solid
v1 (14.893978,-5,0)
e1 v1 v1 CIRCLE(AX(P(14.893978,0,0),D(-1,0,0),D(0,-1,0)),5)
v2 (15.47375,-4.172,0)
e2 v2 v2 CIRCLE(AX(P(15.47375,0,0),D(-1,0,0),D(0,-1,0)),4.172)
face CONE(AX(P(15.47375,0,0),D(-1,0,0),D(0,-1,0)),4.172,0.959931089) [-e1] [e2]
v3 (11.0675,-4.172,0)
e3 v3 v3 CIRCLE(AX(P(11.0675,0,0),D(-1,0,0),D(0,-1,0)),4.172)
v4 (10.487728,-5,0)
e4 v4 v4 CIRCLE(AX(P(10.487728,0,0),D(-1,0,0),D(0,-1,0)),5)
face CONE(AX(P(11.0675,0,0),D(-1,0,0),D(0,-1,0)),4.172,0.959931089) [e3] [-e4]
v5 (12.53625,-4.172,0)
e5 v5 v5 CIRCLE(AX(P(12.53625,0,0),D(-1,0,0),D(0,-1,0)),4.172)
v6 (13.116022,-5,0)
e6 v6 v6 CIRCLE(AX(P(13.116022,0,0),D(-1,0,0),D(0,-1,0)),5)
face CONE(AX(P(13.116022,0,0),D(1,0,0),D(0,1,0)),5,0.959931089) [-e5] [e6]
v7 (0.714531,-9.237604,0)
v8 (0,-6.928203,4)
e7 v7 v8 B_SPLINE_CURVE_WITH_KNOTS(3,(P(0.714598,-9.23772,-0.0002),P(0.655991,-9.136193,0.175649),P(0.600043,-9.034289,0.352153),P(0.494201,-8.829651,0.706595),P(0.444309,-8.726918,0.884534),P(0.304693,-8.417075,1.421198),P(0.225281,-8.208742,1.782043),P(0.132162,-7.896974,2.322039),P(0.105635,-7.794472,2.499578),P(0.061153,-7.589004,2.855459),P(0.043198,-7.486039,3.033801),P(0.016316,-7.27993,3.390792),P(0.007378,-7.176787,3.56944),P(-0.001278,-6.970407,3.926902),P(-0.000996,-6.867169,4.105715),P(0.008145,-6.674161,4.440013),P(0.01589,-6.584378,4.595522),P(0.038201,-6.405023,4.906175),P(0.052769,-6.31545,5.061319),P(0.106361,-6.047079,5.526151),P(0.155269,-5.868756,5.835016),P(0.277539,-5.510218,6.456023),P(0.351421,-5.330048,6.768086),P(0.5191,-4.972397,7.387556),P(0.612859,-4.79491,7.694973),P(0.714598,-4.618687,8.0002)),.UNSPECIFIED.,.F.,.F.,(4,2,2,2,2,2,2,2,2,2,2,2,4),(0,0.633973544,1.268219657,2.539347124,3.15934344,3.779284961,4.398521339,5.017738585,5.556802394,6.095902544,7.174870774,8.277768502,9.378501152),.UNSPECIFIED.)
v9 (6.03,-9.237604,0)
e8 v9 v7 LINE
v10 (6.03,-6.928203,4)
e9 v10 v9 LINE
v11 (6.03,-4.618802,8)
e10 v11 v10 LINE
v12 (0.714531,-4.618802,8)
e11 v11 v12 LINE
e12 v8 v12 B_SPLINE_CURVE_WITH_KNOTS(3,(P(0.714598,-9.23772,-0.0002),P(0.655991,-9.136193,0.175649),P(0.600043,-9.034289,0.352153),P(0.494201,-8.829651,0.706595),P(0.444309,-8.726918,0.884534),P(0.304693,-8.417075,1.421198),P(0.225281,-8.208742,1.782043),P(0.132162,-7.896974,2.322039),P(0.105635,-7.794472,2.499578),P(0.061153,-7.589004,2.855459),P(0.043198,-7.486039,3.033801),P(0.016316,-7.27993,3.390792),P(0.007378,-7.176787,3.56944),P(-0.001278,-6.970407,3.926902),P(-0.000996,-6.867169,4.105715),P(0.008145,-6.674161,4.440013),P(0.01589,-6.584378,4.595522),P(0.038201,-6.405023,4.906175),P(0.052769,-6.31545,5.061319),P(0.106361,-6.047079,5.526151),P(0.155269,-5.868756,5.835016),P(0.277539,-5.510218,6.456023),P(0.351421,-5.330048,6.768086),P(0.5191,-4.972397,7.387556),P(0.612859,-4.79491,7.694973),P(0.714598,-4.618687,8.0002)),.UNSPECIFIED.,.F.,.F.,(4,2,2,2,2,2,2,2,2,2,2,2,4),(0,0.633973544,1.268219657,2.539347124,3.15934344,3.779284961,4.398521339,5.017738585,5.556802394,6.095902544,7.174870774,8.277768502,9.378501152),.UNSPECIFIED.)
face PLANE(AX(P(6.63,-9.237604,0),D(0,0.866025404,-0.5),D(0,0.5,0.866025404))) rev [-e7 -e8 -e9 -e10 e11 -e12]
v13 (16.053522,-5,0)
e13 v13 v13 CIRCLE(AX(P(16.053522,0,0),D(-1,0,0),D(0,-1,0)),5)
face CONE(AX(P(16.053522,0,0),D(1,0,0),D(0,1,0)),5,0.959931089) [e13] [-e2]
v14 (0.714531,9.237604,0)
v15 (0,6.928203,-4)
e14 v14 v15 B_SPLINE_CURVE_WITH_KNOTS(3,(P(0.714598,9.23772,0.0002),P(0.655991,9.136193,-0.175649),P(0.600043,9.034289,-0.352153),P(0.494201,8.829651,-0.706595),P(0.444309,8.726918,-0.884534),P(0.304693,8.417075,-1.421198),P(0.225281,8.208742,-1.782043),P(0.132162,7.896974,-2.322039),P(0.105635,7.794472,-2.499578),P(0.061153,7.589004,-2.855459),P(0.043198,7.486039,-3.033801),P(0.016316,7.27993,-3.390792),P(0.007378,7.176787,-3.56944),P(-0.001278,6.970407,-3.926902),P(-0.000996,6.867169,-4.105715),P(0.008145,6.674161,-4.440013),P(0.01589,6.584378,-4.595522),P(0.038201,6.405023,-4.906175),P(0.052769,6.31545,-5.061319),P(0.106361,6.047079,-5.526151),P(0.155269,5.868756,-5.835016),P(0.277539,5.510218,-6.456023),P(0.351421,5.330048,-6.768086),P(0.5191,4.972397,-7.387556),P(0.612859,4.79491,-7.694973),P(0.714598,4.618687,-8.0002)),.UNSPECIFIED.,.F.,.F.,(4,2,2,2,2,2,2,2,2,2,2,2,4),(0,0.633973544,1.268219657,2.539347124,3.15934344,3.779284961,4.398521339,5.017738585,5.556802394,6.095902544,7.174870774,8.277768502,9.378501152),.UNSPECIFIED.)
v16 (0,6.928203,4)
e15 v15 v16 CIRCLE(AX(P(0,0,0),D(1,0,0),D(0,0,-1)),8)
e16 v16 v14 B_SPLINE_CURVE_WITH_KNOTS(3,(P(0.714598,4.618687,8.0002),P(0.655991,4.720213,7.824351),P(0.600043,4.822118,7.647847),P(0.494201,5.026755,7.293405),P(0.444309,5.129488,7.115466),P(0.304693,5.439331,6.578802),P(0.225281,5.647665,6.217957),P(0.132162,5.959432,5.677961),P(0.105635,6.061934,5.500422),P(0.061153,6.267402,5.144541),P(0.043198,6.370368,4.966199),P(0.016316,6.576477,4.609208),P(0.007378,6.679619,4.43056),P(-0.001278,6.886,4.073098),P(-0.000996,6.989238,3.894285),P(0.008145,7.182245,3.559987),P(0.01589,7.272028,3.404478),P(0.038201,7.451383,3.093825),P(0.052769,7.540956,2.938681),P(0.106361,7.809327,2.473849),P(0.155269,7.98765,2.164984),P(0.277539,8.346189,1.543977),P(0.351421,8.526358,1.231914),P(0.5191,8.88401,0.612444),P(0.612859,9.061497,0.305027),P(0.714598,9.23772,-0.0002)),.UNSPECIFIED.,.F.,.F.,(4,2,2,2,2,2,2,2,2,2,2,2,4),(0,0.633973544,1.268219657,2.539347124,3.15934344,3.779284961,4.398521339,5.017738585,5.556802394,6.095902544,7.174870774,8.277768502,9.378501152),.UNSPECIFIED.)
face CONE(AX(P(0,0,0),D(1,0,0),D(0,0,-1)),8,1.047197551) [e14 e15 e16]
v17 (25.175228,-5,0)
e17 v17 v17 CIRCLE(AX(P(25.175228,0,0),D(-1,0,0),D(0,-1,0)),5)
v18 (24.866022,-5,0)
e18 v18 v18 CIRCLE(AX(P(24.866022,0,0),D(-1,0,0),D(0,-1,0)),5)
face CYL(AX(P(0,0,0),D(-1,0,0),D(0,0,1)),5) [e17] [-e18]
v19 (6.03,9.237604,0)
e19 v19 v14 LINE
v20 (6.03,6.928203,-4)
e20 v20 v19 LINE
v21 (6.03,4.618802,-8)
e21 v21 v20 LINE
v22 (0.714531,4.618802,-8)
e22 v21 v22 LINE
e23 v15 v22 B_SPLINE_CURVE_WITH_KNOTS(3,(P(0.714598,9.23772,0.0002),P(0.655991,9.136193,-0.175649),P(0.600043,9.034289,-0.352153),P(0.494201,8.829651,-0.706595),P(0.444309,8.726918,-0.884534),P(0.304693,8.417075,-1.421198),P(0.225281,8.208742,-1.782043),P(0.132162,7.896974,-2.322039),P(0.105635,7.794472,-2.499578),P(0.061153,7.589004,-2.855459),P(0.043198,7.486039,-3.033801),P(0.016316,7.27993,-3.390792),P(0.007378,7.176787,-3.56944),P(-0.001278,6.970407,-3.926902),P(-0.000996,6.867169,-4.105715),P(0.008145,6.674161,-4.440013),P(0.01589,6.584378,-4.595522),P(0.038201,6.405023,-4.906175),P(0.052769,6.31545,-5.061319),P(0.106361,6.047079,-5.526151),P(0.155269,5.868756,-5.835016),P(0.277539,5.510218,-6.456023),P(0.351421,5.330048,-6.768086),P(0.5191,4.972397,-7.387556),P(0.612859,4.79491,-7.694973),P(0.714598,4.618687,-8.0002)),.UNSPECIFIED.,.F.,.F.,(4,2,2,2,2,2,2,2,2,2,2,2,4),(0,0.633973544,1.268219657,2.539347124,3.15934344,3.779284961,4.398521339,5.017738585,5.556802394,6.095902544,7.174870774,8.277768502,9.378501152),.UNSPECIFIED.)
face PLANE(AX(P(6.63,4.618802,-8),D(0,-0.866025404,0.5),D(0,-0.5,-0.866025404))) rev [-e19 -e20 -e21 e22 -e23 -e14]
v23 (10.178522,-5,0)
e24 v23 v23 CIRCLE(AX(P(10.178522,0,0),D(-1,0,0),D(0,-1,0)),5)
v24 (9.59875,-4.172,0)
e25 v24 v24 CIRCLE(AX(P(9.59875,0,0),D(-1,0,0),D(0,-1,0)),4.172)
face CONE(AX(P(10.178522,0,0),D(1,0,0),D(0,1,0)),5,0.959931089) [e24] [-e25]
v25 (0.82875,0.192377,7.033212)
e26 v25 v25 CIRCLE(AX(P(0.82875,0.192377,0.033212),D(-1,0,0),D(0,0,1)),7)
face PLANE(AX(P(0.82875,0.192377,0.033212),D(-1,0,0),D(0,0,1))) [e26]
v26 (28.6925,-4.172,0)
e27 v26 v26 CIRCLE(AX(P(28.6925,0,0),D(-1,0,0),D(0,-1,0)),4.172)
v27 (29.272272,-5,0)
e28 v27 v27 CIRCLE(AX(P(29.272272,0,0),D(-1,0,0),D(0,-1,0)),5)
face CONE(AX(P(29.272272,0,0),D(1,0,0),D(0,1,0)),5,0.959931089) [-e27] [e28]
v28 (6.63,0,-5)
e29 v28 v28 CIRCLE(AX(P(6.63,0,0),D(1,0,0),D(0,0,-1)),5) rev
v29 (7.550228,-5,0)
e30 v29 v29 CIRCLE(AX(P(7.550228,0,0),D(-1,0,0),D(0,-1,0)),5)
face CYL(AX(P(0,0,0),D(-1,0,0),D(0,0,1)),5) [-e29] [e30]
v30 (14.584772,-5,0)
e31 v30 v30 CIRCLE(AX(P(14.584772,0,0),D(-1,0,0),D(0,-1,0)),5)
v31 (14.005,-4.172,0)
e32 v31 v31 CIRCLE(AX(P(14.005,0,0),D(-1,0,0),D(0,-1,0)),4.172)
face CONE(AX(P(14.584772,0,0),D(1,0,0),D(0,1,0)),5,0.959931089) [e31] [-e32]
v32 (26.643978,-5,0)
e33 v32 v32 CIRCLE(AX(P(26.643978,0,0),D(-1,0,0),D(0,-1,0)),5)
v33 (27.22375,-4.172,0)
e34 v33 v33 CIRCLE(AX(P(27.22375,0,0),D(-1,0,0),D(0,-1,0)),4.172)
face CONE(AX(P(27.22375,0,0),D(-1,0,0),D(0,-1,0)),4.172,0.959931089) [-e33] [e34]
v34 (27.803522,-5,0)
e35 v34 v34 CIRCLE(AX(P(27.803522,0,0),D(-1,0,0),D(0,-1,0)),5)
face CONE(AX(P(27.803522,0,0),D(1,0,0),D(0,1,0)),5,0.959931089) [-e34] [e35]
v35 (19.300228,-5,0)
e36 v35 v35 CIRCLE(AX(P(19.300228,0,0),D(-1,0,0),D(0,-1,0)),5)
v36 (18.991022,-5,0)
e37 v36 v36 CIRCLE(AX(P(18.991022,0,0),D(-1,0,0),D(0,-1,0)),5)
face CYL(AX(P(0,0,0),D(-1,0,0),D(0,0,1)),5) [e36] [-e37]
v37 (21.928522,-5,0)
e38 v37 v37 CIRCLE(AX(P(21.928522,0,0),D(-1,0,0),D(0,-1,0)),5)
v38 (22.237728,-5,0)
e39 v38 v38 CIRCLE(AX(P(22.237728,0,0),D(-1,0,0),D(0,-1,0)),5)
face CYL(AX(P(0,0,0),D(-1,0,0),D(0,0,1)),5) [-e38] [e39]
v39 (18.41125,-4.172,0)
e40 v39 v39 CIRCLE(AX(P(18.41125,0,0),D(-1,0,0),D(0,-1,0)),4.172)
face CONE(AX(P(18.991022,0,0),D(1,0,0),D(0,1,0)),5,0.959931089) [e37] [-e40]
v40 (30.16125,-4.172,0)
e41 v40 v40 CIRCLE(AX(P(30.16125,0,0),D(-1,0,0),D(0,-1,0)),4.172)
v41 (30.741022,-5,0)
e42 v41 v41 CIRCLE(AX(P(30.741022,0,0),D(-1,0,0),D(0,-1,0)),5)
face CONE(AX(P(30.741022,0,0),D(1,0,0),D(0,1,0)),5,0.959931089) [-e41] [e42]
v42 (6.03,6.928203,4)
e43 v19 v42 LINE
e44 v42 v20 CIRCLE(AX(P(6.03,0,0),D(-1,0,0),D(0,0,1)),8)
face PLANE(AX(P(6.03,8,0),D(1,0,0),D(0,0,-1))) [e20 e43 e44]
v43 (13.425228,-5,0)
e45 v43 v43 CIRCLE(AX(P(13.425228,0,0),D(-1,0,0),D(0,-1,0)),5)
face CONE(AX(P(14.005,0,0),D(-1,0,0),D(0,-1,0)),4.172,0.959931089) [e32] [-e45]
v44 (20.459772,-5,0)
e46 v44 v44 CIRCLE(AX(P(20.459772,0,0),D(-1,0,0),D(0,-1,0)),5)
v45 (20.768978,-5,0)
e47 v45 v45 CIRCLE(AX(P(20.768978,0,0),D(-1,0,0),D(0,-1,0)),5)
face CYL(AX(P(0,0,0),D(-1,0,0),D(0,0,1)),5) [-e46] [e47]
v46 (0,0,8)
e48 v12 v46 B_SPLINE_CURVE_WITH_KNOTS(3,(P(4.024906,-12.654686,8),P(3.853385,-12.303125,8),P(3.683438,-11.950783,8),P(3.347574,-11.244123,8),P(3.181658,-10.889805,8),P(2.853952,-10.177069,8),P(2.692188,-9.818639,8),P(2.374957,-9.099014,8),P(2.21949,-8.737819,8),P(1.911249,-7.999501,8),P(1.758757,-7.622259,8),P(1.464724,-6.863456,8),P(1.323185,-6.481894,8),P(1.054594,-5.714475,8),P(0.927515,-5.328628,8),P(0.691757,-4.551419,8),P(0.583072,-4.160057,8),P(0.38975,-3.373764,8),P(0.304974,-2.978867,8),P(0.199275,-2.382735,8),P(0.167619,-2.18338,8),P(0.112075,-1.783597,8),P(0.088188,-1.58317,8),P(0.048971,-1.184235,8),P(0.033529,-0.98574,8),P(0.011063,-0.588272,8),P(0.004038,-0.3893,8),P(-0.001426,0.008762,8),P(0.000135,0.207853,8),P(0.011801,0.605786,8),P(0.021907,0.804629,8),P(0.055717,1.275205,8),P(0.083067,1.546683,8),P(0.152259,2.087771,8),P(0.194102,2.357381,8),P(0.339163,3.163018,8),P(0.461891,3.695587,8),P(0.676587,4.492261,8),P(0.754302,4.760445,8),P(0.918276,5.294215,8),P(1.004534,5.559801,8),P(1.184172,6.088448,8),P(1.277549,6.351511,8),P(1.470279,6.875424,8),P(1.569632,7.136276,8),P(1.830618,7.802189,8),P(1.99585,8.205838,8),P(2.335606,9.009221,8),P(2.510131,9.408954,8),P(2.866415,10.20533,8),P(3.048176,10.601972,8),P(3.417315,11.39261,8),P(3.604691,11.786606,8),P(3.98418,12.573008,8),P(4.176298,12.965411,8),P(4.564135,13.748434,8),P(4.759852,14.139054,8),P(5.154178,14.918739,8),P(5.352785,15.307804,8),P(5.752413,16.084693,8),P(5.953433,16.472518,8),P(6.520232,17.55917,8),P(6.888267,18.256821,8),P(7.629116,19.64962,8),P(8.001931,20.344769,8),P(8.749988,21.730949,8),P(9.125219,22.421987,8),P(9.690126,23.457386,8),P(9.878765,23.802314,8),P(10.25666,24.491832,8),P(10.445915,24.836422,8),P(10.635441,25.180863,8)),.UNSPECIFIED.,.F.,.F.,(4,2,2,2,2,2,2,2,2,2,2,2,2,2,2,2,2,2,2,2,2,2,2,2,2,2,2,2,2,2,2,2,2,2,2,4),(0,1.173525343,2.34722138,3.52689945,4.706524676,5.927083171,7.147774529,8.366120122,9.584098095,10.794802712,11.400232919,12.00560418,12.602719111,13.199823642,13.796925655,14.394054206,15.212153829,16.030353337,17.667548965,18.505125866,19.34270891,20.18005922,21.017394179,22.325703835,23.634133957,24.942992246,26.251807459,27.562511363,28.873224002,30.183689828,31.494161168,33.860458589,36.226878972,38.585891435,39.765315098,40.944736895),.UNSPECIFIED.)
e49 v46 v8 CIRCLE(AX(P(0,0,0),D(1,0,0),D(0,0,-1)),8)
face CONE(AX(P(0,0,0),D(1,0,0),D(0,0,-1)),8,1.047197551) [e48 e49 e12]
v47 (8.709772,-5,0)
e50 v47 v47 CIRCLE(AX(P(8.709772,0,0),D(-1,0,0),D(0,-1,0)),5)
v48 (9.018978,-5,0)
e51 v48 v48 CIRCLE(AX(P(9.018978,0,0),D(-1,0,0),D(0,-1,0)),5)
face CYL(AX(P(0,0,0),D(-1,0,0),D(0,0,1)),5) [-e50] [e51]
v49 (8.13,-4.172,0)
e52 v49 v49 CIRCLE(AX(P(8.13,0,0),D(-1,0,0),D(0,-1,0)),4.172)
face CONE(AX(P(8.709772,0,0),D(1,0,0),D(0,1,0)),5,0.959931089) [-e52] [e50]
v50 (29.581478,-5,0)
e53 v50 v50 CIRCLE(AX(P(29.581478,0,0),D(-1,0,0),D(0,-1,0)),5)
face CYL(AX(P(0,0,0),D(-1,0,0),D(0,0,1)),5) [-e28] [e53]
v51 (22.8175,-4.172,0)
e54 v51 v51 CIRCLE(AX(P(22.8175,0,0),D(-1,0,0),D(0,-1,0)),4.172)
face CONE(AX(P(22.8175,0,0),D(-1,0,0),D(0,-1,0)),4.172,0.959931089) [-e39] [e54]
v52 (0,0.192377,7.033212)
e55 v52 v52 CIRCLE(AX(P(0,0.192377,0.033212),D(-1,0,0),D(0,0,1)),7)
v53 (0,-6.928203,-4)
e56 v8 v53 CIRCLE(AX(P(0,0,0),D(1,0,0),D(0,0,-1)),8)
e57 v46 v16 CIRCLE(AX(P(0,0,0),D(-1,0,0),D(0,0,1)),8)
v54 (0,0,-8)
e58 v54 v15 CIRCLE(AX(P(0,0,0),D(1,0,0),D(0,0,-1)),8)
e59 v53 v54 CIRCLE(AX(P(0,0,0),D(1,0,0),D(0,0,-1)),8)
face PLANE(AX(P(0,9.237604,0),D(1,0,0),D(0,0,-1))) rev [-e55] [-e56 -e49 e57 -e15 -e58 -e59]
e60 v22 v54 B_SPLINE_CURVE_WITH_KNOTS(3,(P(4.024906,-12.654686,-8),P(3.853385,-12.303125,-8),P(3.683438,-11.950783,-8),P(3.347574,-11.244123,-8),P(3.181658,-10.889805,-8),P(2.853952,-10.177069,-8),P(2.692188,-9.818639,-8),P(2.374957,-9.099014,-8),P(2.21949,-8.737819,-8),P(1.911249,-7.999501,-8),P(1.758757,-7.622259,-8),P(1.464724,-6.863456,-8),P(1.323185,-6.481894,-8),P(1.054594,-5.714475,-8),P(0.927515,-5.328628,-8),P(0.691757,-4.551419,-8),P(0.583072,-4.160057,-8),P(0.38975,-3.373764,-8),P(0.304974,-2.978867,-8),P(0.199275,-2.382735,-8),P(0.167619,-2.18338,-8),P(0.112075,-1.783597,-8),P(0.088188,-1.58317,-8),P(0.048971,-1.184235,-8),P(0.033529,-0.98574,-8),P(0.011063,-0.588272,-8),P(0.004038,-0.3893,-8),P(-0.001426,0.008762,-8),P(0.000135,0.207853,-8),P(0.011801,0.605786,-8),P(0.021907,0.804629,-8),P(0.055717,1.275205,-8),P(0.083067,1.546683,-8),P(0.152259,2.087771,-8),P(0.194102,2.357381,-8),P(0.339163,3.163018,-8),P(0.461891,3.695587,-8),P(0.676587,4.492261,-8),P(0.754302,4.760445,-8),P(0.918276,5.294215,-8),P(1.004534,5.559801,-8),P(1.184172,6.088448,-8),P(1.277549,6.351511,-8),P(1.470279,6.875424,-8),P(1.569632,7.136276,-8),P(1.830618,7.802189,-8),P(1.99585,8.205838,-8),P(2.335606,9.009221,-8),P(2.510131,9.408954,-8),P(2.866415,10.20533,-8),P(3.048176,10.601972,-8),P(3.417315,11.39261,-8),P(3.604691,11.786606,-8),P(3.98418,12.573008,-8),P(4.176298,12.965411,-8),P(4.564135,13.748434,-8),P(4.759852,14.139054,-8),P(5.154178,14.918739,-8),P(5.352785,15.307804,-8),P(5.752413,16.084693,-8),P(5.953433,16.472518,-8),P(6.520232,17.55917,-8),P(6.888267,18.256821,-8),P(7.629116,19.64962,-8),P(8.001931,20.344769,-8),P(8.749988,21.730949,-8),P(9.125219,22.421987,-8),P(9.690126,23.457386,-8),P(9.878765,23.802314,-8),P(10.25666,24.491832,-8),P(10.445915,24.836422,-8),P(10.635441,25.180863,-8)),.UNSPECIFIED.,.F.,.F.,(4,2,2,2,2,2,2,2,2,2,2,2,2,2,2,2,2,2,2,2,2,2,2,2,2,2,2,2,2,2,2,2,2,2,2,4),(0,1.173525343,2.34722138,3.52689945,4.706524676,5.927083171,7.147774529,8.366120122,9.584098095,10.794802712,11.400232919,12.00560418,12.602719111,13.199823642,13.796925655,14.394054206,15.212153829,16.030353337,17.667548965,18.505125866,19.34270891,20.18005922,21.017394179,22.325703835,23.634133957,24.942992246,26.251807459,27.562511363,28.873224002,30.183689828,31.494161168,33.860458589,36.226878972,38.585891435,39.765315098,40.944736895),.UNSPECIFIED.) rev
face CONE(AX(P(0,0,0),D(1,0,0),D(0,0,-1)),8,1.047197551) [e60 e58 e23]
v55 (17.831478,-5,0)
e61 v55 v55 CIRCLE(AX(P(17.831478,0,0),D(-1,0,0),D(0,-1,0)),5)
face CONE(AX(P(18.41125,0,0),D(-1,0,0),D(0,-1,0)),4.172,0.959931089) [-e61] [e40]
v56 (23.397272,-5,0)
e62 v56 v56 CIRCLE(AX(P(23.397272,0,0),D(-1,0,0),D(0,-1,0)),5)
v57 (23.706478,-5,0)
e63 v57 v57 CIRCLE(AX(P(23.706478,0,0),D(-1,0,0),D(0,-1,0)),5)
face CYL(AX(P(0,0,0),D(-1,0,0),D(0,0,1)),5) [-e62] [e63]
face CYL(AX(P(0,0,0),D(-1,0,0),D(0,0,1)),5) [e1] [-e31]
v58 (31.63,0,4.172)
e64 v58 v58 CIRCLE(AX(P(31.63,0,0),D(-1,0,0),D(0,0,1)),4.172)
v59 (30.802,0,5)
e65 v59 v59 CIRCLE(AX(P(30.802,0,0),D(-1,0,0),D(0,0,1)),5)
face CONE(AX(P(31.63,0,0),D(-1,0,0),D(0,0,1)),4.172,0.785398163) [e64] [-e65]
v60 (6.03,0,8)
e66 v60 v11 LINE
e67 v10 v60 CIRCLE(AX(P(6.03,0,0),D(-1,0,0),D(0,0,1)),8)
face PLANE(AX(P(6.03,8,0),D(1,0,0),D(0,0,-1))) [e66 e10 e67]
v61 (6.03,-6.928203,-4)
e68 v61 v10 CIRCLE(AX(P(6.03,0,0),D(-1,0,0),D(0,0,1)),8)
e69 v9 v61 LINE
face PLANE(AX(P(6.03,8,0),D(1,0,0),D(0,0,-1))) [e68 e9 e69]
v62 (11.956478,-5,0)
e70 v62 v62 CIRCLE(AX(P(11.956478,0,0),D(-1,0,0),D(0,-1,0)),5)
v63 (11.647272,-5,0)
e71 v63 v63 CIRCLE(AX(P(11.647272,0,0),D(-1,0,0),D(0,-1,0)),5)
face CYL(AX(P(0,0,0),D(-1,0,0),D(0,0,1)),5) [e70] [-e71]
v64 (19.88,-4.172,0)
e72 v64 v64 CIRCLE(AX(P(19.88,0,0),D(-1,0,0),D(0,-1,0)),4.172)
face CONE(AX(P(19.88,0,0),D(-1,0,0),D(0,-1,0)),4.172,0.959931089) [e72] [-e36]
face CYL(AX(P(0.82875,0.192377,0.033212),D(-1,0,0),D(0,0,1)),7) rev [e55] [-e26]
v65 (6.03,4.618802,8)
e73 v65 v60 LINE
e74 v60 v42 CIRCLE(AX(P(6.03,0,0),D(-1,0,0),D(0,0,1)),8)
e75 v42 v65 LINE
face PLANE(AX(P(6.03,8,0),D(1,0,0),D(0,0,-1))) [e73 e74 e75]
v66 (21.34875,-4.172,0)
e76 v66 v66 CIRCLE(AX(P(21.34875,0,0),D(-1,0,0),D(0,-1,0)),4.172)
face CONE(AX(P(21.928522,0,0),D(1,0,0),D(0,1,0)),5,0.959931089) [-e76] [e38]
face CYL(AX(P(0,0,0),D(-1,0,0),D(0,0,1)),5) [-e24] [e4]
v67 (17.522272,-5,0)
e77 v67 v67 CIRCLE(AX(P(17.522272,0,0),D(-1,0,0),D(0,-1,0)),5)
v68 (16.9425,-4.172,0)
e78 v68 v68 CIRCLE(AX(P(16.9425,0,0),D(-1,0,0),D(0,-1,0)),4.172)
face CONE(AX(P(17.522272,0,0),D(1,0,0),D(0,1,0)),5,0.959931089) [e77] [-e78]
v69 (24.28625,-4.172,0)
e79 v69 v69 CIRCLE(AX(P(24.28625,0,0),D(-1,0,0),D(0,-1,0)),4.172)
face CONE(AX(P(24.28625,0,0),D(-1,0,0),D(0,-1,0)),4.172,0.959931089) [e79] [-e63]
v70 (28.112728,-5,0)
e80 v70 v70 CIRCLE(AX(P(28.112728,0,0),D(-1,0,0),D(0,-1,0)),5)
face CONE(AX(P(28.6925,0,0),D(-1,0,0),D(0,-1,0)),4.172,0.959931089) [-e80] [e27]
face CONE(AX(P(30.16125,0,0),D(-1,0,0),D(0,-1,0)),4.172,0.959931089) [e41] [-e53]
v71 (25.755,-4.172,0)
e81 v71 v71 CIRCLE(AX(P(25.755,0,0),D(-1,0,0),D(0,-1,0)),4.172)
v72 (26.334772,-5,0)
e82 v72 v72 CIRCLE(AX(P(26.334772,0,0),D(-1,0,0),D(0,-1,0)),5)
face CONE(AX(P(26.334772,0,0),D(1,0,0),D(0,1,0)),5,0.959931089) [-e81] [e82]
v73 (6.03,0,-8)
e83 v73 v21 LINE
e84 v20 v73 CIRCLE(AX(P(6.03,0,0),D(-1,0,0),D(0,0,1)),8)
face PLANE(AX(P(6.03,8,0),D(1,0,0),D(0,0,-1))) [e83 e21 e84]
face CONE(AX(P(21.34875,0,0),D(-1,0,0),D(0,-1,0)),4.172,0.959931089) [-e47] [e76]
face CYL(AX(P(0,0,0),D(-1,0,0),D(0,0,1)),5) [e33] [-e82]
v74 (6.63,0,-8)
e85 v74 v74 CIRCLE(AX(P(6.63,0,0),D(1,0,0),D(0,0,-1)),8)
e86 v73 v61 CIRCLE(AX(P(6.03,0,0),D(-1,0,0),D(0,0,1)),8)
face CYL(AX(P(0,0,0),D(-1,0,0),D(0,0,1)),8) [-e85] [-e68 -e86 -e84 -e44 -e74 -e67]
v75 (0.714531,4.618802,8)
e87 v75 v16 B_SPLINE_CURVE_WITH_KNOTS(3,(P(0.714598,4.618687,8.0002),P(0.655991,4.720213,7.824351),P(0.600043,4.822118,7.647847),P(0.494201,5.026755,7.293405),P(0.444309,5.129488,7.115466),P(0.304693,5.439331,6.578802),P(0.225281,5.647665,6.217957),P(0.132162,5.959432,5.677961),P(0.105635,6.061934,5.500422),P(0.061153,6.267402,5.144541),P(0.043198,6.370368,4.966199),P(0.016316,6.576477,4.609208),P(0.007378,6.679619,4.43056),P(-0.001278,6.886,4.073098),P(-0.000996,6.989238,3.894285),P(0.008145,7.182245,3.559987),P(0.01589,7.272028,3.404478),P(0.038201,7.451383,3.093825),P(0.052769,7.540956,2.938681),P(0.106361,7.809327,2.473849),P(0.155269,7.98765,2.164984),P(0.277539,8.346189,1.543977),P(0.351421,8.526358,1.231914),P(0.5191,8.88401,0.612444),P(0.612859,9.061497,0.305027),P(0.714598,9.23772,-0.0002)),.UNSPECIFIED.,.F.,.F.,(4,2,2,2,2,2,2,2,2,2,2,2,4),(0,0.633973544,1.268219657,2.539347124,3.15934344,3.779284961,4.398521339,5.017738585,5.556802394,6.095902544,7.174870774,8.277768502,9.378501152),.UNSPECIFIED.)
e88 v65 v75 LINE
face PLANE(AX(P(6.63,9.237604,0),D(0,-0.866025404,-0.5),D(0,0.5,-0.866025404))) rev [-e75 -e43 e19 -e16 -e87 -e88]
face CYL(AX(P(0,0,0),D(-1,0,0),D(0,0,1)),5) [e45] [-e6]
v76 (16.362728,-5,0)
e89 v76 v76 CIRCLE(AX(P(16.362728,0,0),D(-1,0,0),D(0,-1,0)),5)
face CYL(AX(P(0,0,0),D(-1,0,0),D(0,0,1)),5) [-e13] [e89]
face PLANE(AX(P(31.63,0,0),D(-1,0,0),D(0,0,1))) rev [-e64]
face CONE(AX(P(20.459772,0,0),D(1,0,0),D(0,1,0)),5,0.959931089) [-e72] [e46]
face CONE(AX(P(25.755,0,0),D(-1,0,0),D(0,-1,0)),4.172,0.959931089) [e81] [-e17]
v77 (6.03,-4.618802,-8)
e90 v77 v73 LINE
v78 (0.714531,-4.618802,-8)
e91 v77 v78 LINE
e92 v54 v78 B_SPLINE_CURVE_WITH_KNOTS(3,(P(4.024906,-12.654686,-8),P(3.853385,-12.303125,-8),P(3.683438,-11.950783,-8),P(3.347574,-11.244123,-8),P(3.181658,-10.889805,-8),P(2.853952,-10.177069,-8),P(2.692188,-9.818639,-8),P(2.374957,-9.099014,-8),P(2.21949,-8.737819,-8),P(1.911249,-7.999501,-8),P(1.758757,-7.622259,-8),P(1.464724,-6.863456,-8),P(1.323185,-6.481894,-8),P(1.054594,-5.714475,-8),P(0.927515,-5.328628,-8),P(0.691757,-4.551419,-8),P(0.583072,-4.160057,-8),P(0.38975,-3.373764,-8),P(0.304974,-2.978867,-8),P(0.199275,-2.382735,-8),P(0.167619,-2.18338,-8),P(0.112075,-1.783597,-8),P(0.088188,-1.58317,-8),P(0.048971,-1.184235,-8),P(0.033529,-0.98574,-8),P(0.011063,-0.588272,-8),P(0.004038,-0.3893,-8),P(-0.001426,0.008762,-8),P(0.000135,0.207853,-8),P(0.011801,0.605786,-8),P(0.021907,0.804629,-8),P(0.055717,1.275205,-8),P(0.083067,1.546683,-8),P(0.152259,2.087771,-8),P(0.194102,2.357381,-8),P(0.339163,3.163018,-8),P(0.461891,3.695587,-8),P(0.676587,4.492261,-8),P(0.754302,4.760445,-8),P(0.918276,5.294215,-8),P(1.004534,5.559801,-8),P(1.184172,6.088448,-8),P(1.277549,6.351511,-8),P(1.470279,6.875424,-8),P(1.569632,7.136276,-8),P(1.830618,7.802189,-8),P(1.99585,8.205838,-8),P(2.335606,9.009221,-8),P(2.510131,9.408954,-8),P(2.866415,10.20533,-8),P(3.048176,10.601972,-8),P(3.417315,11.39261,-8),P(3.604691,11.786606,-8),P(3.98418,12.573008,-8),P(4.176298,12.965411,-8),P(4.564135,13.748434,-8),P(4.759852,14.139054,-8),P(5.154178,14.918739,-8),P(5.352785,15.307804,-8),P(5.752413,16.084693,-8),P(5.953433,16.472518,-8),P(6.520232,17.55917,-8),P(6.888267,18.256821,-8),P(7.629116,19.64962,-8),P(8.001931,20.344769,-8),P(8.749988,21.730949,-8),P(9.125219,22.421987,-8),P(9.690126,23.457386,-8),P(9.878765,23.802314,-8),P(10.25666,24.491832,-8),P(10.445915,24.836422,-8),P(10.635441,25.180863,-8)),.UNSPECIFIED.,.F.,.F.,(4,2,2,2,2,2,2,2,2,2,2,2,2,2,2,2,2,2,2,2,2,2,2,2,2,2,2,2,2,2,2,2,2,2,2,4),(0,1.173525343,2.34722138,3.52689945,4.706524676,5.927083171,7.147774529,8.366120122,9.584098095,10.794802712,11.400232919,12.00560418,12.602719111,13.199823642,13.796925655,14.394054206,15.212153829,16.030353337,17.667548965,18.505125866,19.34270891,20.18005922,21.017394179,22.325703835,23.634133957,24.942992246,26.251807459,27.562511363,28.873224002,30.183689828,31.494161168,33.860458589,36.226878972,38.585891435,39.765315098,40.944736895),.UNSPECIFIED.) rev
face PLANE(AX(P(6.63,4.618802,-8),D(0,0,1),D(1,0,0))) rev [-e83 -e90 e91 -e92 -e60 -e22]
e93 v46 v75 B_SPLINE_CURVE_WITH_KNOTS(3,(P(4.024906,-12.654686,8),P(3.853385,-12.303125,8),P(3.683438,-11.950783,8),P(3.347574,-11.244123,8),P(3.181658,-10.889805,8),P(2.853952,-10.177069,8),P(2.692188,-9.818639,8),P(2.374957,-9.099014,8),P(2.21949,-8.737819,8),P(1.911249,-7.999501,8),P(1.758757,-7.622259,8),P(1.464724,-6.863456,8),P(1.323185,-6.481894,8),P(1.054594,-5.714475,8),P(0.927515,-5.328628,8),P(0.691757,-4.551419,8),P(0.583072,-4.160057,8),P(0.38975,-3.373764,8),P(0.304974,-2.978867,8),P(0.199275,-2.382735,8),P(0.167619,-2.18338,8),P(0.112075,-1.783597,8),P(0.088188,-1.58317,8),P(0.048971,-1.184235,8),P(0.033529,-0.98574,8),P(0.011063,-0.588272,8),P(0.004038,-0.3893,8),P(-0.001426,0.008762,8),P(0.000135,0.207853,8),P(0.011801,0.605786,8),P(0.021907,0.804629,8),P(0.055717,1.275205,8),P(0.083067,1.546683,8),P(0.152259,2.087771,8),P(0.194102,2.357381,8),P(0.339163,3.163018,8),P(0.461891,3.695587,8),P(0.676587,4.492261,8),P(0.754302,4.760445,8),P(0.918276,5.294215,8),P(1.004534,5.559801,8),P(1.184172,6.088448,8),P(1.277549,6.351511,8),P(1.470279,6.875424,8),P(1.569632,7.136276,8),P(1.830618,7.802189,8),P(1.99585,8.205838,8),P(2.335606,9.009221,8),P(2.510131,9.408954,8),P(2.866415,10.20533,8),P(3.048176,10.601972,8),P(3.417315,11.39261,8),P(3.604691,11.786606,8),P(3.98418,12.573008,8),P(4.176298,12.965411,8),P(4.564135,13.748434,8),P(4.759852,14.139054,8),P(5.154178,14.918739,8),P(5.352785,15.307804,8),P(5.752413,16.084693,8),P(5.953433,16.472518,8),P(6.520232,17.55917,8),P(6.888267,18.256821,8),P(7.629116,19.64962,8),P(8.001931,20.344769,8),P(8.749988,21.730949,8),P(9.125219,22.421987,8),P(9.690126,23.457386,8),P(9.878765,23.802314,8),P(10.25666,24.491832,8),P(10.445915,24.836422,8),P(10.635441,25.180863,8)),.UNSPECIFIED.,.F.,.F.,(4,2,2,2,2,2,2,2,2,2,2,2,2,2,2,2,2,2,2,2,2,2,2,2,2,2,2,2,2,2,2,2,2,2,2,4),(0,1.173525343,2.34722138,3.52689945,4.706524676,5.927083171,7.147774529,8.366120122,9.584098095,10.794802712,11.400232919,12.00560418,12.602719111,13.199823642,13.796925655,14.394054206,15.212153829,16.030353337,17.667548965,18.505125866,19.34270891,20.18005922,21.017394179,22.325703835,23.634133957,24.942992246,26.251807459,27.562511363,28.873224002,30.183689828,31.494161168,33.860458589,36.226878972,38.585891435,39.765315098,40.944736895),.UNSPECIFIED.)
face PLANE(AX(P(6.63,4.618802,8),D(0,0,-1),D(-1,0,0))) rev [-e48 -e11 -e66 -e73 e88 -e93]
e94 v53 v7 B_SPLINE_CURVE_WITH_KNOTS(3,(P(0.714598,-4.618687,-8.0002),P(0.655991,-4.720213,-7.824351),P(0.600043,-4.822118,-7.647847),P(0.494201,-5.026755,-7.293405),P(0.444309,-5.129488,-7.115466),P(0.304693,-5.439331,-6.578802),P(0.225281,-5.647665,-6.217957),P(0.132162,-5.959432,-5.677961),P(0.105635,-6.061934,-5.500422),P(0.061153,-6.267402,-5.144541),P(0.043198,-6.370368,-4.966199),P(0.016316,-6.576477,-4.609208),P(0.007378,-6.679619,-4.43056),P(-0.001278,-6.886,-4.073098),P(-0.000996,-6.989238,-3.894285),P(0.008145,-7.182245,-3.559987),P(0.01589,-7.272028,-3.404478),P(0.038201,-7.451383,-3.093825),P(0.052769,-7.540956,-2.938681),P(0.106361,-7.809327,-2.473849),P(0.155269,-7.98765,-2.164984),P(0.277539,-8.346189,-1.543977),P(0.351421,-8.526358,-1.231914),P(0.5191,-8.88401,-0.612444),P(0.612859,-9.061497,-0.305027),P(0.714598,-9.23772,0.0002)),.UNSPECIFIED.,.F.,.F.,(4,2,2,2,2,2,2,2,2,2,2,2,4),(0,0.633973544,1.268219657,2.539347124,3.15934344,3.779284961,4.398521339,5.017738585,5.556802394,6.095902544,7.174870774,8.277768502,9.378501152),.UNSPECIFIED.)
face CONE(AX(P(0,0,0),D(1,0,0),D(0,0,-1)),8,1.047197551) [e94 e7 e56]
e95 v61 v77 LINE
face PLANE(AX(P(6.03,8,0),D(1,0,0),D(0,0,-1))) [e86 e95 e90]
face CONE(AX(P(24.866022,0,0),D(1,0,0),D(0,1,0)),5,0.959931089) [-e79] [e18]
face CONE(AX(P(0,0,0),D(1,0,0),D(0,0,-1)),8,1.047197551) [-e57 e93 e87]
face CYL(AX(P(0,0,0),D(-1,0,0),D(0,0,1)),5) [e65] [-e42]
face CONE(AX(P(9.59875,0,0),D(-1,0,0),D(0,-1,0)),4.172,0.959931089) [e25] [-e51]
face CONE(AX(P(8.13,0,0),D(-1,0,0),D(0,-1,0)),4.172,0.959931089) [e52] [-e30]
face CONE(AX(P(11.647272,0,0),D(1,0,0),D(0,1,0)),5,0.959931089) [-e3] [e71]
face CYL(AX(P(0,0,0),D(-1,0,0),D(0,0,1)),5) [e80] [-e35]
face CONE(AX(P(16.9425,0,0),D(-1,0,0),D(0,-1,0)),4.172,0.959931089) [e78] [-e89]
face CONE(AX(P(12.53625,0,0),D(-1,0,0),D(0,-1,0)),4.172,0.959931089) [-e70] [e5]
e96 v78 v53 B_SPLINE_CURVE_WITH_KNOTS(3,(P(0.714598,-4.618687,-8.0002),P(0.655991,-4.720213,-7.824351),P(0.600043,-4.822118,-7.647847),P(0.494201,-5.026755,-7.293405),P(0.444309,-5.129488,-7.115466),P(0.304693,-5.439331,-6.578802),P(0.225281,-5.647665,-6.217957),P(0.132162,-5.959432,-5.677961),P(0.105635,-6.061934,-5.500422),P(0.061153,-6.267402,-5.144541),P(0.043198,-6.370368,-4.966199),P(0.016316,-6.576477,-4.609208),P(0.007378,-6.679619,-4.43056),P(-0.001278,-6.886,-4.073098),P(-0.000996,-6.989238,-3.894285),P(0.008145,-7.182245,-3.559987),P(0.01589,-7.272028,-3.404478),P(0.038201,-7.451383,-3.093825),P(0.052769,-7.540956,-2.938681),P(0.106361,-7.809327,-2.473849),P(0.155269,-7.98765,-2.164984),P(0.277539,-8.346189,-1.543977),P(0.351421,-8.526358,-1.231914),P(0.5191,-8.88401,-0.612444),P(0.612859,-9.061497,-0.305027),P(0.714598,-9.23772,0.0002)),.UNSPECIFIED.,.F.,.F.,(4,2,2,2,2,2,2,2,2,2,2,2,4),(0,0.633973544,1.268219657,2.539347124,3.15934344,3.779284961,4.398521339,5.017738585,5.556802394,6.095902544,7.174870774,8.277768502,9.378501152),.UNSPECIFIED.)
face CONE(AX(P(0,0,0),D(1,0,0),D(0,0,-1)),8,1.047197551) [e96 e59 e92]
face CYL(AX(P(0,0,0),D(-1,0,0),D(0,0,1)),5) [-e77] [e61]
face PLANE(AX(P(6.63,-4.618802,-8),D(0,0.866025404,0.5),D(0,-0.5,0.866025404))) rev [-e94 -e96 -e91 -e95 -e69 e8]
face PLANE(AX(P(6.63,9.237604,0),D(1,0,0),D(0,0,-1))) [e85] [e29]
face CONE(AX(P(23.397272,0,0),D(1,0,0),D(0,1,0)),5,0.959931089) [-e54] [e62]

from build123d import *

# Parameters (mm, degrees)
BASEHEAD_DEPTH     = 6.63
INDENT_START       = -0.82875
INDENT_2_OUTLINE_R = 7
INDENT_2_DEPTH     = 0.82875
SKETCH4_W          = 0.6
SKETCH4_H          = 11.237604307
THDSCHPAT_COUNT    = 16
THDSCHPAT_PITCH    = 1.46875


# Read off the part's stored shape, not the designer's step: Indent
with BuildPart() as part:
    # Sketch1 → BaseHead (new body)
    with BuildSketch(Plane(origin=(0, 0, 0), x_dir=(0, 0, -1), z_dir=(1, 0, 0))):
        Polygon((8, 4.618802154), (8, -4.618802154), (0, -9.237604307), (-8, -4.618802154), (-8, 4.618802154), (0, 9.237604307), align=None)
    extrude(amount=BASEHEAD_DEPTH)

    # Indent outline → Indent (revolve)
    with BuildSketch(Plane.YX):
        Polygon((5, 6.63), (5, 30.802), (4.172, 31.63), (0, 31.63), (0, 6.63), align=None)
    revolve(axis=Axis((0, 0, 0), (1, 0, 0)))

    # Indent 2 outline → Indent 2 (cut)
    with BuildSketch(Plane.ZY.offset(INDENT_START)):
        with Locations((0.033212245, 0.192376607)):
            Circle(INDENT_2_OUTLINE_R)
    extrude(amount=INDENT_2_DEPTH, mode=Mode.SUBTRACT)

    # Sketch3 → HeadChamfer (revolve, cut)
    with BuildSketch(Plane.XY, mode=Mode.PRIVATE) as headchamfer_sk:
        Polygon((0, 8), (3.601282526, 14.237604307), (3.601282526, 19.237604307), (-10, 19.237604307), (-10, 8), align=None)
    revolve(headchamfer_sk.sketch.rotate(Axis((0, 0, 0), (1, 0, 0)), 90), axis=Axis((0, 0, 0), (1, 0, 0)), mode=Mode.SUBTRACT)

    # Sketch4 → BearingFace (revolve, cut)
    with BuildSketch(Plane.XY, mode=Mode.PRIVATE) as bearingface_sk:
        with Locations((6.33, 13.618802154)):
            Rectangle(SKETCH4_W, SKETCH4_H)
    revolve(bearingface_sk.sketch.rotate(Axis((0, 0, 0), (1, 0, 0)), 90), axis=Axis((0, 0, 0), (1, 0, 0)), mode=Mode.SUBTRACT)

    # ThdSchSke → ThreadSchematic (revolve, cut)
    with BuildSketch(Plane.XY):
        Polygon((8.13, -4.172), (7.550228158, -5), (7.550228158, -6.25), (8.709771842, -6.25), (8.709771842, -5), align=None)
    threadschematic = revolve(axis=Axis((-3.175, 0, 0), (1, 0, 0)), mode=Mode.SUBTRACT)

    # ThdSchPat: ThreadSchematic ×16
    with Locations(*[(i * THDSCHPAT_PITCH, 0, 0) for i in range(1, THDSCHPAT_COUNT)]):
        add(threadschematic, mode=Mode.SUBTRACT)


solid = part.part
